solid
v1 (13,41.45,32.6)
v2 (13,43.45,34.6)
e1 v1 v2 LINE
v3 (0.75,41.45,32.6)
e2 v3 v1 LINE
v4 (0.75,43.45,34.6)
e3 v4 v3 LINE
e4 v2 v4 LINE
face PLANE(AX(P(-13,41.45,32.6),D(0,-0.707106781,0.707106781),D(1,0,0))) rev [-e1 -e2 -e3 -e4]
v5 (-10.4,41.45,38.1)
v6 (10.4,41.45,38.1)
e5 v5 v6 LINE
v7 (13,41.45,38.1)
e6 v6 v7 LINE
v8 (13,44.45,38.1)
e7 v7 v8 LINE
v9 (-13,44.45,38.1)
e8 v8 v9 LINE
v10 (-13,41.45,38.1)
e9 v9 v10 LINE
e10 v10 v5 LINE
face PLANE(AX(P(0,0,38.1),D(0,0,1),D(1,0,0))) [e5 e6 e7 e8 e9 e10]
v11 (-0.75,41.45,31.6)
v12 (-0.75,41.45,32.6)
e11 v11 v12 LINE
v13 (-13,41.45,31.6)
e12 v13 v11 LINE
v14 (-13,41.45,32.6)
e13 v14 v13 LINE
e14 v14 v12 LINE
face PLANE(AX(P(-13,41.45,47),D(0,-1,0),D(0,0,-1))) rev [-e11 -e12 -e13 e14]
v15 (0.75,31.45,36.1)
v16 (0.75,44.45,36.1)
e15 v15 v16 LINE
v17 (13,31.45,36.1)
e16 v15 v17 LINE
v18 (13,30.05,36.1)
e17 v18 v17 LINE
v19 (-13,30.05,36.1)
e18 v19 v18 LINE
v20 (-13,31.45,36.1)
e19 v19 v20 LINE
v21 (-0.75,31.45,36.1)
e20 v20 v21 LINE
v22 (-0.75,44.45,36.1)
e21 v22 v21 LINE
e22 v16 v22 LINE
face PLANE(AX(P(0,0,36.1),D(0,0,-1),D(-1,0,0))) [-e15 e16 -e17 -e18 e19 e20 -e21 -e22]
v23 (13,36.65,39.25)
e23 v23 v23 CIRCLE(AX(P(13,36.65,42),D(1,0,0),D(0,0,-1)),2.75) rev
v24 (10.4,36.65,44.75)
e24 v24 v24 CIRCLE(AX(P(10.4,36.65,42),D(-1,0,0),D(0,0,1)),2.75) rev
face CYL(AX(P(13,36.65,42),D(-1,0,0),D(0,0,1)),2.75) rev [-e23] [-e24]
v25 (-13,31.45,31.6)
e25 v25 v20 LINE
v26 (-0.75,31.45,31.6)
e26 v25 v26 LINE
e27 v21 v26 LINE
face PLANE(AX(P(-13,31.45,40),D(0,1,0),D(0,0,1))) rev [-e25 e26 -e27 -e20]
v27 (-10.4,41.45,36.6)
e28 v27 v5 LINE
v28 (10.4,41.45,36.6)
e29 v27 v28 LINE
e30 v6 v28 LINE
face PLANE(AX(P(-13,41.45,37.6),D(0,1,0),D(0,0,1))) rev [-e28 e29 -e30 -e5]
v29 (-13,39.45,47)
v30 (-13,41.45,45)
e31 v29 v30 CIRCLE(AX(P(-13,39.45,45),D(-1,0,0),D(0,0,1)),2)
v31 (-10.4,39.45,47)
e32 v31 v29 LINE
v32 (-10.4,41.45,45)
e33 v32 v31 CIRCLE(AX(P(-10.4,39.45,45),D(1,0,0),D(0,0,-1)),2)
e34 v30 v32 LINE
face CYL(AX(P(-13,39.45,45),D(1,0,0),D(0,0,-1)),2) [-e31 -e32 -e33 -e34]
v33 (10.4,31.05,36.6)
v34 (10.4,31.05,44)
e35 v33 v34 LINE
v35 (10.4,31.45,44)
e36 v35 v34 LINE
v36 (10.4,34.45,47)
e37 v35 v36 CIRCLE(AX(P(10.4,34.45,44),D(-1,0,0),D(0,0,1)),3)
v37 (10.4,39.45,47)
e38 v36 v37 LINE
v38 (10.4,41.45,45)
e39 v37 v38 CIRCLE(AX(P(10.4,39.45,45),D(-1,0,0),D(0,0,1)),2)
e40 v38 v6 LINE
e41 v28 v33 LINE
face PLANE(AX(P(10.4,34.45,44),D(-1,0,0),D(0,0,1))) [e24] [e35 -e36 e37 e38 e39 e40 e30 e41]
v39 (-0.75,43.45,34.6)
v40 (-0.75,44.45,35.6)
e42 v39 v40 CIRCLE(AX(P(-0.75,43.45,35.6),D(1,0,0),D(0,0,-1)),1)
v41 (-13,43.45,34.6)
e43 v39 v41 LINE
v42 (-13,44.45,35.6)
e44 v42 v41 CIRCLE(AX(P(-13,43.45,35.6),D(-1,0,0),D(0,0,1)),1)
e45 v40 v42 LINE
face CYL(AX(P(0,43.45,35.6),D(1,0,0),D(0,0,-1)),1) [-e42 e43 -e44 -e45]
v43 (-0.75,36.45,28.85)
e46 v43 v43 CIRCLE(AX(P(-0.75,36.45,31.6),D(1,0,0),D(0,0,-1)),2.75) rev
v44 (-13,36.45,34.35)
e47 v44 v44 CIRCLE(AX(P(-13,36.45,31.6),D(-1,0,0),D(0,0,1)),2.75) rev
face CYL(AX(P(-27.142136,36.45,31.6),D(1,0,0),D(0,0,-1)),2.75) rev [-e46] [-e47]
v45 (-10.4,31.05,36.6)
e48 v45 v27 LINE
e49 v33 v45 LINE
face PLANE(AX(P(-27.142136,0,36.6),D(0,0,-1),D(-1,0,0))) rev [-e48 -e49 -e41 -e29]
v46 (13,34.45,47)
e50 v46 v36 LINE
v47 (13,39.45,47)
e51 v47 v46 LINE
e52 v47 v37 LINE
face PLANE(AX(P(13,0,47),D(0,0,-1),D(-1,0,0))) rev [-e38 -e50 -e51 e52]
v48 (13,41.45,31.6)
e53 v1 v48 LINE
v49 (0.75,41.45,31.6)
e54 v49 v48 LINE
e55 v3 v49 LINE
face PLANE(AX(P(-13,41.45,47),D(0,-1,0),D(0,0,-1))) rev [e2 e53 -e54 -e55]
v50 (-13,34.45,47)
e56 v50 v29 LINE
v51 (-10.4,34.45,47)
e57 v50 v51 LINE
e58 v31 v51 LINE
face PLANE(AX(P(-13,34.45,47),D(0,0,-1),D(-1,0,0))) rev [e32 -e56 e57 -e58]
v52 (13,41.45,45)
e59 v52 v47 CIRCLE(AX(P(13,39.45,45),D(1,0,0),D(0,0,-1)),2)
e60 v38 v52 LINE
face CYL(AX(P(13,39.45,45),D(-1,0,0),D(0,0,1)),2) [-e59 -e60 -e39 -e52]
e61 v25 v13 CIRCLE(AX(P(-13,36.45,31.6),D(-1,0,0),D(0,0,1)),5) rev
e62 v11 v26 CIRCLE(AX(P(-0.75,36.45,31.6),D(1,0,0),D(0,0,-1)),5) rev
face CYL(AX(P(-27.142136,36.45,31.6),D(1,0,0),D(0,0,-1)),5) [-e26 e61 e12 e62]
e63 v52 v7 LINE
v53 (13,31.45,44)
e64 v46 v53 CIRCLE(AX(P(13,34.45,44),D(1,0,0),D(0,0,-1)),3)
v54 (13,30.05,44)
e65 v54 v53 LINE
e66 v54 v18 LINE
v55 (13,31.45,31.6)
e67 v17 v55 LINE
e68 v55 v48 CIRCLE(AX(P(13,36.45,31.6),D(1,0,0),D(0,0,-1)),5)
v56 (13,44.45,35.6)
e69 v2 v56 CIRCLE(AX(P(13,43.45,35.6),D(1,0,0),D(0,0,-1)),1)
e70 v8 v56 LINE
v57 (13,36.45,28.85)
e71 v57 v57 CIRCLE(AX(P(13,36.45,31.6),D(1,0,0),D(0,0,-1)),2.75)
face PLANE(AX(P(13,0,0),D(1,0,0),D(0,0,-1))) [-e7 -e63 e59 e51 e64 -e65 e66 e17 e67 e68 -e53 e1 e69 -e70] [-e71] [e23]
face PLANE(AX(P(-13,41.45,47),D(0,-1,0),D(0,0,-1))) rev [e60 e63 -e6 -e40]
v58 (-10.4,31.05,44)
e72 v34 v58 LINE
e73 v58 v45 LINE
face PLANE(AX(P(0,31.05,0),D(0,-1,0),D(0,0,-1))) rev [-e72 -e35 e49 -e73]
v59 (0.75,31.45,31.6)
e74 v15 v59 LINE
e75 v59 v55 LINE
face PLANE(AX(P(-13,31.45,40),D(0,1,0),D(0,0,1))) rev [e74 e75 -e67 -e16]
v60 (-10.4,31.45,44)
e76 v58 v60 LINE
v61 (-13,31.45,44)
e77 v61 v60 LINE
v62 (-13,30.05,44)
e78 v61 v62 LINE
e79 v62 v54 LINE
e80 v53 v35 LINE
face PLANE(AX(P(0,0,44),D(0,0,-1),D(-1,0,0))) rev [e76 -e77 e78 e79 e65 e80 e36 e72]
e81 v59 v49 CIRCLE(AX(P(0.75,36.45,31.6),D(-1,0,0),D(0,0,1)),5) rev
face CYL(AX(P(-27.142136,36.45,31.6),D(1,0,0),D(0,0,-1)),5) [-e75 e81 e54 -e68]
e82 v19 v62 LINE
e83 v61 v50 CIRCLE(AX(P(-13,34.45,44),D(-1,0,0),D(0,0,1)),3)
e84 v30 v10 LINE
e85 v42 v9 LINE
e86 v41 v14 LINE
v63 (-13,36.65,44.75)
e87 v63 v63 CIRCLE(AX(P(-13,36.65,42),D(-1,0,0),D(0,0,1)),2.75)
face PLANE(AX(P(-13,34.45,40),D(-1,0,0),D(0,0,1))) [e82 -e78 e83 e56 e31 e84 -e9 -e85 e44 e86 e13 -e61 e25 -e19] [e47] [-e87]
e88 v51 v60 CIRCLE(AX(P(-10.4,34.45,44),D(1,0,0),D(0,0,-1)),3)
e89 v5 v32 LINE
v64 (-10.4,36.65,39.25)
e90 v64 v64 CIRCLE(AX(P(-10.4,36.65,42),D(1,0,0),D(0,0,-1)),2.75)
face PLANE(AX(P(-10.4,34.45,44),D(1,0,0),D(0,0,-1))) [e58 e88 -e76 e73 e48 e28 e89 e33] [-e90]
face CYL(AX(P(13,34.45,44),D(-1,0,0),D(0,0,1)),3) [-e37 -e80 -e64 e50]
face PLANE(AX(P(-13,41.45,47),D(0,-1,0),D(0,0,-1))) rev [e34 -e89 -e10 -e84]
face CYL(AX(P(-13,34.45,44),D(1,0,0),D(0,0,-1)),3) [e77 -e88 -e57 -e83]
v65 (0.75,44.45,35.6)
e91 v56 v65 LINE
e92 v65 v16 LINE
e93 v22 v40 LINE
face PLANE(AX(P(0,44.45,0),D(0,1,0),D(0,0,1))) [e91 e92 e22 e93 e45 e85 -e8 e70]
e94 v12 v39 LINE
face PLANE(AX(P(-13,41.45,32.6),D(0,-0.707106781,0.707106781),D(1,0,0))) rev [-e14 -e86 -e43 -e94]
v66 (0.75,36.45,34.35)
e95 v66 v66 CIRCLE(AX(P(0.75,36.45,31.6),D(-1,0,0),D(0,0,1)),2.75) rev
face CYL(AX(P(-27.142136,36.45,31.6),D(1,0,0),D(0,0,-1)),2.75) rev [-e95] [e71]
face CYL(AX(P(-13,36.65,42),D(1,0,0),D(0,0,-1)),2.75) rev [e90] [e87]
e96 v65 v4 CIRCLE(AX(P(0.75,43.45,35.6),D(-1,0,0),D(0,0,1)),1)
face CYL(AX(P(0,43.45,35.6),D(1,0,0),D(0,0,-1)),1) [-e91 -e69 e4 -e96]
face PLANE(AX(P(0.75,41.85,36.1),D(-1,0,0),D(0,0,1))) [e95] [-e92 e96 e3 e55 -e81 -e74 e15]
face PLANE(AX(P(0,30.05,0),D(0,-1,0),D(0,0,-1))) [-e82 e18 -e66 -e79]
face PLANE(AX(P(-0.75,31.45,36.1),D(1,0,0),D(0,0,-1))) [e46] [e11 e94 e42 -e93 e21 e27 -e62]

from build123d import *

# Parameters (mm, degrees)
SKETCH3_R            = 2.75
BOSS_EXTRUDE1_DEPTH  = 3
SKETCH4_R            = 2.75
BOSS_EXTRUDE2_DEPTH  = 3
BOSS_EXTRUDE3_DEPTH  = 3
BOSS_EXTRUDE4_START  = -3
SKETCH6_R            = 2.75
BOSS_EXTRUDE4_DEPTH  = 3
CUT_EXTRUDE1_START   = -0.4
CUT_EXTRUDE1_DEPTH   = 0.4
CUT_EXTRUDE2_DEPTH   = 0.4
BOSS_EXTRUDE5_DEPTH  = 26
SKETCH11_W           = 1.5
SKETCH11_H           = 10.4
CUT_EXTRUDE4_DEPTH   = 9.5
SKETCH13_W           = 13.75
SKETCH13_H           = 0.5
BOSS_EXTRUDE6_DEPTH  = 1
BOSS_EXTRUDE7_DEPTH  = 1
BOSS_EXTRUDE8_DEPTH  = 3
CHAMFER1_SIZE        = 2
FILLET1_R            = 1
SKETCH16_W           = 26
SKETCH16_H           = 3
BOSS_EXTRUDE9_DEPTH  = 1
FILLET2_R            = 2
BOSS_EXTRUDE11_DEPTH = 2.4
BOSS_EXTRUDE12_DEPTH = 1
CUT_EXTRUDE5_DEPTH   = 0.5


with BuildPart() as part:
    # Sketch3 → Boss-Extrude1 (new body)
    with BuildSketch(Plane(origin=(10, 0, 0), x_dir=(0, 0, -1), z_dir=(1, 0, 0))):
        with BuildLine():
            Line((-37, 41.45), (-42, 41.45))
            Line((-42, 41.45), (-47, 41.45))
            Line((-47, 41.45), (-47, 34.45))
            ThreePointArc((-47, 34.45), (-46.121320344, 32.328679656), (-44, 31.45))
            Line((-44, 31.45), (-40, 31.45))
            ThreePointArc((-40, 31.45), (-37.878679656, 32.328679656), (-37, 34.45))
            Line((-37, 34.45), (-37, 41.45))
        make_face()
        with Locations((-42, 36.65)):
            Circle(SKETCH3_R, mode=Mode.SUBTRACT)
    extrude(amount=BOSS_EXTRUDE1_DEPTH)

    # Sketch6 → Boss-Extrude4 (add)
    with BuildSketch(Plane(origin=(13, 0, 0), x_dir=(0, 0, -1), z_dir=(1, 0, 0)).offset(BOSS_EXTRUDE4_START)):
        with BuildLine():
            Line((-36.6, 31.45), (-36.6, 41.45))
            Line((-36.6, 41.45), (-47, 41.45))
            Line((-47, 41.45), (-47, 34.45))
            ThreePointArc((-47, 34.45), (-46.121320344, 32.328679656), (-44, 31.45))
            Line((-44, 31.45), (-36.6, 31.45))
        make_face()
        with Locations(Location((-42, 36.65, 0), (0, 0, 180))):
            Circle(SKETCH6_R, mode=Mode.SUBTRACT)
    extrude(amount=BOSS_EXTRUDE4_DEPTH)

    # Sketch8 → Cut-Extrude2 (cut)
    with BuildSketch(Plane.ZY.offset(-10)):
        with BuildLine():
            Line((47, 41.45), (36.6, 41.45))
            Line((36.6, 41.45), (36.6, 31.45))
            Line((36.6, 31.45), (44, 31.45))
            ThreePointArc((44, 31.45), (46.121320344, 32.328679656), (47, 34.45))
            Line((47, 34.45), (47, 41.45))
        make_face()
    extrude(amount=-CUT_EXTRUDE2_DEPTH, mode=Mode.SUBTRACT)



with BuildPart() as body_2:
    # Sketch4 → Boss-Extrude2 (new body)
    with BuildSketch(Plane.ZY.offset(10)):
        with BuildLine():
            Line((47, 41.45), (37, 41.45))
            Line((37, 41.45), (37, 34.45))
            ThreePointArc((37, 34.45), (37.878679656, 32.328679656), (40, 31.45))
            Line((40, 31.45), (44, 31.45))
            ThreePointArc((44, 31.45), (46.121320344, 32.328679656), (47, 34.45))
            Line((47, 34.45), (47, 41.45))
        make_face()
        with Locations((42, 36.65)):
            Circle(SKETCH4_R, mode=Mode.SUBTRACT)
    extrude(amount=BOSS_EXTRUDE2_DEPTH)

    # Sketch5 → Boss-Extrude3 (add)
    with BuildSketch(Plane.ZY.offset(13)):
        with BuildLine():
            Line((37, 41.45), (36.6, 41.45))
            Line((36.6, 41.45), (36.6, 31.45))
            Line((36.6, 31.45), (40, 31.45))
            ThreePointArc((40, 31.45), (37.878679656, 32.328679656), (37, 34.45))
            Line((37, 34.45), (37, 41.45))
        make_face()
    extrude(amount=-BOSS_EXTRUDE3_DEPTH)

    # Sketch7 → Cut-Extrude1 (cut)
    with BuildSketch(Plane(origin=(-10, 0, 0), x_dir=(0, 0, -1), z_dir=(1, 0, 0)).offset(CUT_EXTRUDE1_START)):
        with BuildLine():
            Line((-36.6, 41.45), (-47, 41.45))
            Line((-47, 41.45), (-47, 34.45))
            ThreePointArc((-47, 34.45), (-46.121320344, 32.328679656), (-44, 31.45))
            Line((-44, 31.45), (-36.6, 31.45))
            Line((-36.6, 31.45), (-36.6, 41.45))
        make_face()
    extrude(amount=CUT_EXTRUDE1_DEPTH, mode=Mode.SUBTRACT)


with BuildPart() as part_1:
    add(part.part)

    add(body_2.part)  # Boss-Extrude5 merges body 2
    # Sketch9 → Boss-Extrude5 (add)
    with BuildSketch(Plane(origin=(13, 0, 0), x_dir=(0, 0, -1), z_dir=(1, 0, 0))):
        with BuildLine():
            ThreePointArc((-31.6, 41.45), (-35.135533906, 39.985533906), (-36.6, 36.45))
            Line((-36.6, 36.45), (-34.35, 36.45))
            ThreePointArc((-34.35, 36.45), (-31.6, 39.2), (-28.85, 36.45))
            Line((-28.85, 36.45), (-26.6, 36.45))
            ThreePointArc((-26.6, 36.45), (-28.064466094, 39.985533906), (-31.6, 41.45))
        make_face()
        with BuildLine():
            Line((-34.35, 36.45), (-36.6, 36.45))
            ThreePointArc((-36.6, 36.45), (-35.135533906, 32.914466094), (-31.6, 31.45))
            ThreePointArc((-31.6, 31.45), (-28.064466094, 32.914466094), (-26.6, 36.45))
            Line((-26.6, 36.45), (-28.85, 36.45))
            ThreePointArc((-28.85, 36.45), (-31.6, 33.7), (-34.35, 36.45))
        make_face()
        with BuildLine():
            Line((-36.6, 41.45), (-36.6, 36.45))
            ThreePointArc((-36.6, 36.45), (-35.135533906, 39.985533906), (-31.6, 41.45))
            Line((-31.6, 41.45), (-36.6, 41.45))
        make_face()
        with BuildLine():
            Line((-36.6, 36.45), (-36.6, 31.45))
            Line((-36.6, 31.45), (-34.34369351, 31.45))
            Line((-34.34369351, 31.45), (-31.6, 31.45))
            ThreePointArc((-31.6, 31.45), (-35.135533906, 32.914466094), (-36.6, 36.45))
        make_face()
    extrude(amount=-BOSS_EXTRUDE5_DEPTH)

    # Sketch11 → Cut-Extrude4 (cut, symmetric)
    with BuildSketch(Plane.XY.offset(26.6)):
        with Locations((0, 36.65)):
            Rectangle(SKETCH11_W, SKETCH11_H)
    extrude(amount=CUT_EXTRUDE4_DEPTH, both=True, mode=Mode.SUBTRACT)



with BuildPart() as body_2_2:
    # Sketch13 → Boss-Extrude6 (new body)
    with BuildSketch(Plane(origin=(0, 31.05, 0), x_dir=(-1, 0, 0), z_dir=(0, -1, 0))):
        Polygon((-0.75, -36.6), (-10.4, -36.6), (-13, -36.6), (-13, -41.6), (13, -41.6), (13, -36.6), align=None)
        with Locations((6.125, -36.35)):
            Rectangle(SKETCH13_W, SKETCH13_H)
        Polygon((-13, -36.6), (-10.4, -36.6), (-0.75, -36.6), (-0.75, -36.1), (-13, -36.1), align=None)
    extrude(amount=BOSS_EXTRUDE6_DEPTH)


with BuildPart() as part_2:
    add(part_1.part)

    add(body_2_2.part)  # Boss-Extrude7 merges body 2 2
    # Sketch14 → Boss-Extrude7 (add)
    with BuildSketch(Plane.XZ.offset(-31.45)):
        Polygon((10.4, 41.6), (13, 41.6), (13, 36.1), (-13, 36.1), (-13, 41.6), (-10.4, 41.6), (-10.4, 36.6), (10.4, 36.6), align=None)
    extrude(amount=BOSS_EXTRUDE7_DEPTH)

    # Sketch15 → Boss-Extrude8 (add)
    with BuildSketch(Plane(origin=(0, 41.45, 0), x_dir=(1, 0, 0), z_dir=(0, 1, 0))):
        Polygon((-10.4, -36.6), (10.4, -36.6), (13, -36.6), (13, -34.6), (0.75, -34.6), (0.75, -36.1), (-0.75, -36.1), (-0.75, -34.6), (-13, -34.6), (-13, -36.6), align=None)
    extrude(amount=BOSS_EXTRUDE8_DEPTH)

    # Chamfer1
    chamfer1_edges = [part_2.edges().sort_by_distance(p)[0] for p in [
        (-6.875, 41.45, 34.6),
        (6.875, 41.45, 34.6),
    ]]
    chamfer(chamfer1_edges, length=CHAMFER1_SIZE)

    # Fillet1
    fillet1_edges = [part_2.edges().sort_by_distance(p)[0] for p in [
        (-6.875, 44.45, 34.6),
        (6.875, 44.45, 34.6),
    ]]
    fillet(fillet1_edges, radius=FILLET1_R - 0.0001)  # a hair under: the kernel refuses the full size

    # Sketch16 → Boss-Extrude9 (add)
    with BuildSketch(Plane.XY.offset(36.6)):
        with Locations((0, 42.95)):
            Rectangle(SKETCH16_W, SKETCH16_H)
    extrude(amount=BOSS_EXTRUDE9_DEPTH)

    # Fillet2
    fillet2_edges = [part_2.edges().sort_by_distance(p)[0] for p in [
        (-11.7, 41.45, 47),
        (11.7, 41.45, 47),
    ]]
    fillet(fillet2_edges, radius=FILLET2_R)

    # Sketch17 → Boss-Extrude11 (add)
    with BuildSketch(Plane.XY.offset(41.6)):
        Polygon((10.4, 31.05), (-10.4, 31.05), (-10.4, 31.45), (-13, 31.45), (-13, 30.05), (13, 30.05), (13, 31.45), (10.4, 31.45), align=None)
    extrude(amount=BOSS_EXTRUDE11_DEPTH)

    # Sketch18 → Boss-Extrude12 (add)
    with BuildSketch(Plane.XY.offset(37.6)):
        Polygon((-13, 44.45), (-13, 41.45), (-10.4, 41.45), (10.4, 41.45), (13, 41.45), (13, 44.45), align=None)
    extrude(amount=BOSS_EXTRUDE12_DEPTH)

    # Sketch19 → Cut-Extrude5 (cut)
    with BuildSketch(Plane.XY.offset(38.6)):
        Polygon((13, 44.45), (-13, 44.45), (-13, 41.45), (-10.4, 41.45), (10.4, 41.45), (13, 41.45), align=None)
    extrude(amount=-CUT_EXTRUDE5_DEPTH, mode=Mode.SUBTRACT)


solid = part_2.part
